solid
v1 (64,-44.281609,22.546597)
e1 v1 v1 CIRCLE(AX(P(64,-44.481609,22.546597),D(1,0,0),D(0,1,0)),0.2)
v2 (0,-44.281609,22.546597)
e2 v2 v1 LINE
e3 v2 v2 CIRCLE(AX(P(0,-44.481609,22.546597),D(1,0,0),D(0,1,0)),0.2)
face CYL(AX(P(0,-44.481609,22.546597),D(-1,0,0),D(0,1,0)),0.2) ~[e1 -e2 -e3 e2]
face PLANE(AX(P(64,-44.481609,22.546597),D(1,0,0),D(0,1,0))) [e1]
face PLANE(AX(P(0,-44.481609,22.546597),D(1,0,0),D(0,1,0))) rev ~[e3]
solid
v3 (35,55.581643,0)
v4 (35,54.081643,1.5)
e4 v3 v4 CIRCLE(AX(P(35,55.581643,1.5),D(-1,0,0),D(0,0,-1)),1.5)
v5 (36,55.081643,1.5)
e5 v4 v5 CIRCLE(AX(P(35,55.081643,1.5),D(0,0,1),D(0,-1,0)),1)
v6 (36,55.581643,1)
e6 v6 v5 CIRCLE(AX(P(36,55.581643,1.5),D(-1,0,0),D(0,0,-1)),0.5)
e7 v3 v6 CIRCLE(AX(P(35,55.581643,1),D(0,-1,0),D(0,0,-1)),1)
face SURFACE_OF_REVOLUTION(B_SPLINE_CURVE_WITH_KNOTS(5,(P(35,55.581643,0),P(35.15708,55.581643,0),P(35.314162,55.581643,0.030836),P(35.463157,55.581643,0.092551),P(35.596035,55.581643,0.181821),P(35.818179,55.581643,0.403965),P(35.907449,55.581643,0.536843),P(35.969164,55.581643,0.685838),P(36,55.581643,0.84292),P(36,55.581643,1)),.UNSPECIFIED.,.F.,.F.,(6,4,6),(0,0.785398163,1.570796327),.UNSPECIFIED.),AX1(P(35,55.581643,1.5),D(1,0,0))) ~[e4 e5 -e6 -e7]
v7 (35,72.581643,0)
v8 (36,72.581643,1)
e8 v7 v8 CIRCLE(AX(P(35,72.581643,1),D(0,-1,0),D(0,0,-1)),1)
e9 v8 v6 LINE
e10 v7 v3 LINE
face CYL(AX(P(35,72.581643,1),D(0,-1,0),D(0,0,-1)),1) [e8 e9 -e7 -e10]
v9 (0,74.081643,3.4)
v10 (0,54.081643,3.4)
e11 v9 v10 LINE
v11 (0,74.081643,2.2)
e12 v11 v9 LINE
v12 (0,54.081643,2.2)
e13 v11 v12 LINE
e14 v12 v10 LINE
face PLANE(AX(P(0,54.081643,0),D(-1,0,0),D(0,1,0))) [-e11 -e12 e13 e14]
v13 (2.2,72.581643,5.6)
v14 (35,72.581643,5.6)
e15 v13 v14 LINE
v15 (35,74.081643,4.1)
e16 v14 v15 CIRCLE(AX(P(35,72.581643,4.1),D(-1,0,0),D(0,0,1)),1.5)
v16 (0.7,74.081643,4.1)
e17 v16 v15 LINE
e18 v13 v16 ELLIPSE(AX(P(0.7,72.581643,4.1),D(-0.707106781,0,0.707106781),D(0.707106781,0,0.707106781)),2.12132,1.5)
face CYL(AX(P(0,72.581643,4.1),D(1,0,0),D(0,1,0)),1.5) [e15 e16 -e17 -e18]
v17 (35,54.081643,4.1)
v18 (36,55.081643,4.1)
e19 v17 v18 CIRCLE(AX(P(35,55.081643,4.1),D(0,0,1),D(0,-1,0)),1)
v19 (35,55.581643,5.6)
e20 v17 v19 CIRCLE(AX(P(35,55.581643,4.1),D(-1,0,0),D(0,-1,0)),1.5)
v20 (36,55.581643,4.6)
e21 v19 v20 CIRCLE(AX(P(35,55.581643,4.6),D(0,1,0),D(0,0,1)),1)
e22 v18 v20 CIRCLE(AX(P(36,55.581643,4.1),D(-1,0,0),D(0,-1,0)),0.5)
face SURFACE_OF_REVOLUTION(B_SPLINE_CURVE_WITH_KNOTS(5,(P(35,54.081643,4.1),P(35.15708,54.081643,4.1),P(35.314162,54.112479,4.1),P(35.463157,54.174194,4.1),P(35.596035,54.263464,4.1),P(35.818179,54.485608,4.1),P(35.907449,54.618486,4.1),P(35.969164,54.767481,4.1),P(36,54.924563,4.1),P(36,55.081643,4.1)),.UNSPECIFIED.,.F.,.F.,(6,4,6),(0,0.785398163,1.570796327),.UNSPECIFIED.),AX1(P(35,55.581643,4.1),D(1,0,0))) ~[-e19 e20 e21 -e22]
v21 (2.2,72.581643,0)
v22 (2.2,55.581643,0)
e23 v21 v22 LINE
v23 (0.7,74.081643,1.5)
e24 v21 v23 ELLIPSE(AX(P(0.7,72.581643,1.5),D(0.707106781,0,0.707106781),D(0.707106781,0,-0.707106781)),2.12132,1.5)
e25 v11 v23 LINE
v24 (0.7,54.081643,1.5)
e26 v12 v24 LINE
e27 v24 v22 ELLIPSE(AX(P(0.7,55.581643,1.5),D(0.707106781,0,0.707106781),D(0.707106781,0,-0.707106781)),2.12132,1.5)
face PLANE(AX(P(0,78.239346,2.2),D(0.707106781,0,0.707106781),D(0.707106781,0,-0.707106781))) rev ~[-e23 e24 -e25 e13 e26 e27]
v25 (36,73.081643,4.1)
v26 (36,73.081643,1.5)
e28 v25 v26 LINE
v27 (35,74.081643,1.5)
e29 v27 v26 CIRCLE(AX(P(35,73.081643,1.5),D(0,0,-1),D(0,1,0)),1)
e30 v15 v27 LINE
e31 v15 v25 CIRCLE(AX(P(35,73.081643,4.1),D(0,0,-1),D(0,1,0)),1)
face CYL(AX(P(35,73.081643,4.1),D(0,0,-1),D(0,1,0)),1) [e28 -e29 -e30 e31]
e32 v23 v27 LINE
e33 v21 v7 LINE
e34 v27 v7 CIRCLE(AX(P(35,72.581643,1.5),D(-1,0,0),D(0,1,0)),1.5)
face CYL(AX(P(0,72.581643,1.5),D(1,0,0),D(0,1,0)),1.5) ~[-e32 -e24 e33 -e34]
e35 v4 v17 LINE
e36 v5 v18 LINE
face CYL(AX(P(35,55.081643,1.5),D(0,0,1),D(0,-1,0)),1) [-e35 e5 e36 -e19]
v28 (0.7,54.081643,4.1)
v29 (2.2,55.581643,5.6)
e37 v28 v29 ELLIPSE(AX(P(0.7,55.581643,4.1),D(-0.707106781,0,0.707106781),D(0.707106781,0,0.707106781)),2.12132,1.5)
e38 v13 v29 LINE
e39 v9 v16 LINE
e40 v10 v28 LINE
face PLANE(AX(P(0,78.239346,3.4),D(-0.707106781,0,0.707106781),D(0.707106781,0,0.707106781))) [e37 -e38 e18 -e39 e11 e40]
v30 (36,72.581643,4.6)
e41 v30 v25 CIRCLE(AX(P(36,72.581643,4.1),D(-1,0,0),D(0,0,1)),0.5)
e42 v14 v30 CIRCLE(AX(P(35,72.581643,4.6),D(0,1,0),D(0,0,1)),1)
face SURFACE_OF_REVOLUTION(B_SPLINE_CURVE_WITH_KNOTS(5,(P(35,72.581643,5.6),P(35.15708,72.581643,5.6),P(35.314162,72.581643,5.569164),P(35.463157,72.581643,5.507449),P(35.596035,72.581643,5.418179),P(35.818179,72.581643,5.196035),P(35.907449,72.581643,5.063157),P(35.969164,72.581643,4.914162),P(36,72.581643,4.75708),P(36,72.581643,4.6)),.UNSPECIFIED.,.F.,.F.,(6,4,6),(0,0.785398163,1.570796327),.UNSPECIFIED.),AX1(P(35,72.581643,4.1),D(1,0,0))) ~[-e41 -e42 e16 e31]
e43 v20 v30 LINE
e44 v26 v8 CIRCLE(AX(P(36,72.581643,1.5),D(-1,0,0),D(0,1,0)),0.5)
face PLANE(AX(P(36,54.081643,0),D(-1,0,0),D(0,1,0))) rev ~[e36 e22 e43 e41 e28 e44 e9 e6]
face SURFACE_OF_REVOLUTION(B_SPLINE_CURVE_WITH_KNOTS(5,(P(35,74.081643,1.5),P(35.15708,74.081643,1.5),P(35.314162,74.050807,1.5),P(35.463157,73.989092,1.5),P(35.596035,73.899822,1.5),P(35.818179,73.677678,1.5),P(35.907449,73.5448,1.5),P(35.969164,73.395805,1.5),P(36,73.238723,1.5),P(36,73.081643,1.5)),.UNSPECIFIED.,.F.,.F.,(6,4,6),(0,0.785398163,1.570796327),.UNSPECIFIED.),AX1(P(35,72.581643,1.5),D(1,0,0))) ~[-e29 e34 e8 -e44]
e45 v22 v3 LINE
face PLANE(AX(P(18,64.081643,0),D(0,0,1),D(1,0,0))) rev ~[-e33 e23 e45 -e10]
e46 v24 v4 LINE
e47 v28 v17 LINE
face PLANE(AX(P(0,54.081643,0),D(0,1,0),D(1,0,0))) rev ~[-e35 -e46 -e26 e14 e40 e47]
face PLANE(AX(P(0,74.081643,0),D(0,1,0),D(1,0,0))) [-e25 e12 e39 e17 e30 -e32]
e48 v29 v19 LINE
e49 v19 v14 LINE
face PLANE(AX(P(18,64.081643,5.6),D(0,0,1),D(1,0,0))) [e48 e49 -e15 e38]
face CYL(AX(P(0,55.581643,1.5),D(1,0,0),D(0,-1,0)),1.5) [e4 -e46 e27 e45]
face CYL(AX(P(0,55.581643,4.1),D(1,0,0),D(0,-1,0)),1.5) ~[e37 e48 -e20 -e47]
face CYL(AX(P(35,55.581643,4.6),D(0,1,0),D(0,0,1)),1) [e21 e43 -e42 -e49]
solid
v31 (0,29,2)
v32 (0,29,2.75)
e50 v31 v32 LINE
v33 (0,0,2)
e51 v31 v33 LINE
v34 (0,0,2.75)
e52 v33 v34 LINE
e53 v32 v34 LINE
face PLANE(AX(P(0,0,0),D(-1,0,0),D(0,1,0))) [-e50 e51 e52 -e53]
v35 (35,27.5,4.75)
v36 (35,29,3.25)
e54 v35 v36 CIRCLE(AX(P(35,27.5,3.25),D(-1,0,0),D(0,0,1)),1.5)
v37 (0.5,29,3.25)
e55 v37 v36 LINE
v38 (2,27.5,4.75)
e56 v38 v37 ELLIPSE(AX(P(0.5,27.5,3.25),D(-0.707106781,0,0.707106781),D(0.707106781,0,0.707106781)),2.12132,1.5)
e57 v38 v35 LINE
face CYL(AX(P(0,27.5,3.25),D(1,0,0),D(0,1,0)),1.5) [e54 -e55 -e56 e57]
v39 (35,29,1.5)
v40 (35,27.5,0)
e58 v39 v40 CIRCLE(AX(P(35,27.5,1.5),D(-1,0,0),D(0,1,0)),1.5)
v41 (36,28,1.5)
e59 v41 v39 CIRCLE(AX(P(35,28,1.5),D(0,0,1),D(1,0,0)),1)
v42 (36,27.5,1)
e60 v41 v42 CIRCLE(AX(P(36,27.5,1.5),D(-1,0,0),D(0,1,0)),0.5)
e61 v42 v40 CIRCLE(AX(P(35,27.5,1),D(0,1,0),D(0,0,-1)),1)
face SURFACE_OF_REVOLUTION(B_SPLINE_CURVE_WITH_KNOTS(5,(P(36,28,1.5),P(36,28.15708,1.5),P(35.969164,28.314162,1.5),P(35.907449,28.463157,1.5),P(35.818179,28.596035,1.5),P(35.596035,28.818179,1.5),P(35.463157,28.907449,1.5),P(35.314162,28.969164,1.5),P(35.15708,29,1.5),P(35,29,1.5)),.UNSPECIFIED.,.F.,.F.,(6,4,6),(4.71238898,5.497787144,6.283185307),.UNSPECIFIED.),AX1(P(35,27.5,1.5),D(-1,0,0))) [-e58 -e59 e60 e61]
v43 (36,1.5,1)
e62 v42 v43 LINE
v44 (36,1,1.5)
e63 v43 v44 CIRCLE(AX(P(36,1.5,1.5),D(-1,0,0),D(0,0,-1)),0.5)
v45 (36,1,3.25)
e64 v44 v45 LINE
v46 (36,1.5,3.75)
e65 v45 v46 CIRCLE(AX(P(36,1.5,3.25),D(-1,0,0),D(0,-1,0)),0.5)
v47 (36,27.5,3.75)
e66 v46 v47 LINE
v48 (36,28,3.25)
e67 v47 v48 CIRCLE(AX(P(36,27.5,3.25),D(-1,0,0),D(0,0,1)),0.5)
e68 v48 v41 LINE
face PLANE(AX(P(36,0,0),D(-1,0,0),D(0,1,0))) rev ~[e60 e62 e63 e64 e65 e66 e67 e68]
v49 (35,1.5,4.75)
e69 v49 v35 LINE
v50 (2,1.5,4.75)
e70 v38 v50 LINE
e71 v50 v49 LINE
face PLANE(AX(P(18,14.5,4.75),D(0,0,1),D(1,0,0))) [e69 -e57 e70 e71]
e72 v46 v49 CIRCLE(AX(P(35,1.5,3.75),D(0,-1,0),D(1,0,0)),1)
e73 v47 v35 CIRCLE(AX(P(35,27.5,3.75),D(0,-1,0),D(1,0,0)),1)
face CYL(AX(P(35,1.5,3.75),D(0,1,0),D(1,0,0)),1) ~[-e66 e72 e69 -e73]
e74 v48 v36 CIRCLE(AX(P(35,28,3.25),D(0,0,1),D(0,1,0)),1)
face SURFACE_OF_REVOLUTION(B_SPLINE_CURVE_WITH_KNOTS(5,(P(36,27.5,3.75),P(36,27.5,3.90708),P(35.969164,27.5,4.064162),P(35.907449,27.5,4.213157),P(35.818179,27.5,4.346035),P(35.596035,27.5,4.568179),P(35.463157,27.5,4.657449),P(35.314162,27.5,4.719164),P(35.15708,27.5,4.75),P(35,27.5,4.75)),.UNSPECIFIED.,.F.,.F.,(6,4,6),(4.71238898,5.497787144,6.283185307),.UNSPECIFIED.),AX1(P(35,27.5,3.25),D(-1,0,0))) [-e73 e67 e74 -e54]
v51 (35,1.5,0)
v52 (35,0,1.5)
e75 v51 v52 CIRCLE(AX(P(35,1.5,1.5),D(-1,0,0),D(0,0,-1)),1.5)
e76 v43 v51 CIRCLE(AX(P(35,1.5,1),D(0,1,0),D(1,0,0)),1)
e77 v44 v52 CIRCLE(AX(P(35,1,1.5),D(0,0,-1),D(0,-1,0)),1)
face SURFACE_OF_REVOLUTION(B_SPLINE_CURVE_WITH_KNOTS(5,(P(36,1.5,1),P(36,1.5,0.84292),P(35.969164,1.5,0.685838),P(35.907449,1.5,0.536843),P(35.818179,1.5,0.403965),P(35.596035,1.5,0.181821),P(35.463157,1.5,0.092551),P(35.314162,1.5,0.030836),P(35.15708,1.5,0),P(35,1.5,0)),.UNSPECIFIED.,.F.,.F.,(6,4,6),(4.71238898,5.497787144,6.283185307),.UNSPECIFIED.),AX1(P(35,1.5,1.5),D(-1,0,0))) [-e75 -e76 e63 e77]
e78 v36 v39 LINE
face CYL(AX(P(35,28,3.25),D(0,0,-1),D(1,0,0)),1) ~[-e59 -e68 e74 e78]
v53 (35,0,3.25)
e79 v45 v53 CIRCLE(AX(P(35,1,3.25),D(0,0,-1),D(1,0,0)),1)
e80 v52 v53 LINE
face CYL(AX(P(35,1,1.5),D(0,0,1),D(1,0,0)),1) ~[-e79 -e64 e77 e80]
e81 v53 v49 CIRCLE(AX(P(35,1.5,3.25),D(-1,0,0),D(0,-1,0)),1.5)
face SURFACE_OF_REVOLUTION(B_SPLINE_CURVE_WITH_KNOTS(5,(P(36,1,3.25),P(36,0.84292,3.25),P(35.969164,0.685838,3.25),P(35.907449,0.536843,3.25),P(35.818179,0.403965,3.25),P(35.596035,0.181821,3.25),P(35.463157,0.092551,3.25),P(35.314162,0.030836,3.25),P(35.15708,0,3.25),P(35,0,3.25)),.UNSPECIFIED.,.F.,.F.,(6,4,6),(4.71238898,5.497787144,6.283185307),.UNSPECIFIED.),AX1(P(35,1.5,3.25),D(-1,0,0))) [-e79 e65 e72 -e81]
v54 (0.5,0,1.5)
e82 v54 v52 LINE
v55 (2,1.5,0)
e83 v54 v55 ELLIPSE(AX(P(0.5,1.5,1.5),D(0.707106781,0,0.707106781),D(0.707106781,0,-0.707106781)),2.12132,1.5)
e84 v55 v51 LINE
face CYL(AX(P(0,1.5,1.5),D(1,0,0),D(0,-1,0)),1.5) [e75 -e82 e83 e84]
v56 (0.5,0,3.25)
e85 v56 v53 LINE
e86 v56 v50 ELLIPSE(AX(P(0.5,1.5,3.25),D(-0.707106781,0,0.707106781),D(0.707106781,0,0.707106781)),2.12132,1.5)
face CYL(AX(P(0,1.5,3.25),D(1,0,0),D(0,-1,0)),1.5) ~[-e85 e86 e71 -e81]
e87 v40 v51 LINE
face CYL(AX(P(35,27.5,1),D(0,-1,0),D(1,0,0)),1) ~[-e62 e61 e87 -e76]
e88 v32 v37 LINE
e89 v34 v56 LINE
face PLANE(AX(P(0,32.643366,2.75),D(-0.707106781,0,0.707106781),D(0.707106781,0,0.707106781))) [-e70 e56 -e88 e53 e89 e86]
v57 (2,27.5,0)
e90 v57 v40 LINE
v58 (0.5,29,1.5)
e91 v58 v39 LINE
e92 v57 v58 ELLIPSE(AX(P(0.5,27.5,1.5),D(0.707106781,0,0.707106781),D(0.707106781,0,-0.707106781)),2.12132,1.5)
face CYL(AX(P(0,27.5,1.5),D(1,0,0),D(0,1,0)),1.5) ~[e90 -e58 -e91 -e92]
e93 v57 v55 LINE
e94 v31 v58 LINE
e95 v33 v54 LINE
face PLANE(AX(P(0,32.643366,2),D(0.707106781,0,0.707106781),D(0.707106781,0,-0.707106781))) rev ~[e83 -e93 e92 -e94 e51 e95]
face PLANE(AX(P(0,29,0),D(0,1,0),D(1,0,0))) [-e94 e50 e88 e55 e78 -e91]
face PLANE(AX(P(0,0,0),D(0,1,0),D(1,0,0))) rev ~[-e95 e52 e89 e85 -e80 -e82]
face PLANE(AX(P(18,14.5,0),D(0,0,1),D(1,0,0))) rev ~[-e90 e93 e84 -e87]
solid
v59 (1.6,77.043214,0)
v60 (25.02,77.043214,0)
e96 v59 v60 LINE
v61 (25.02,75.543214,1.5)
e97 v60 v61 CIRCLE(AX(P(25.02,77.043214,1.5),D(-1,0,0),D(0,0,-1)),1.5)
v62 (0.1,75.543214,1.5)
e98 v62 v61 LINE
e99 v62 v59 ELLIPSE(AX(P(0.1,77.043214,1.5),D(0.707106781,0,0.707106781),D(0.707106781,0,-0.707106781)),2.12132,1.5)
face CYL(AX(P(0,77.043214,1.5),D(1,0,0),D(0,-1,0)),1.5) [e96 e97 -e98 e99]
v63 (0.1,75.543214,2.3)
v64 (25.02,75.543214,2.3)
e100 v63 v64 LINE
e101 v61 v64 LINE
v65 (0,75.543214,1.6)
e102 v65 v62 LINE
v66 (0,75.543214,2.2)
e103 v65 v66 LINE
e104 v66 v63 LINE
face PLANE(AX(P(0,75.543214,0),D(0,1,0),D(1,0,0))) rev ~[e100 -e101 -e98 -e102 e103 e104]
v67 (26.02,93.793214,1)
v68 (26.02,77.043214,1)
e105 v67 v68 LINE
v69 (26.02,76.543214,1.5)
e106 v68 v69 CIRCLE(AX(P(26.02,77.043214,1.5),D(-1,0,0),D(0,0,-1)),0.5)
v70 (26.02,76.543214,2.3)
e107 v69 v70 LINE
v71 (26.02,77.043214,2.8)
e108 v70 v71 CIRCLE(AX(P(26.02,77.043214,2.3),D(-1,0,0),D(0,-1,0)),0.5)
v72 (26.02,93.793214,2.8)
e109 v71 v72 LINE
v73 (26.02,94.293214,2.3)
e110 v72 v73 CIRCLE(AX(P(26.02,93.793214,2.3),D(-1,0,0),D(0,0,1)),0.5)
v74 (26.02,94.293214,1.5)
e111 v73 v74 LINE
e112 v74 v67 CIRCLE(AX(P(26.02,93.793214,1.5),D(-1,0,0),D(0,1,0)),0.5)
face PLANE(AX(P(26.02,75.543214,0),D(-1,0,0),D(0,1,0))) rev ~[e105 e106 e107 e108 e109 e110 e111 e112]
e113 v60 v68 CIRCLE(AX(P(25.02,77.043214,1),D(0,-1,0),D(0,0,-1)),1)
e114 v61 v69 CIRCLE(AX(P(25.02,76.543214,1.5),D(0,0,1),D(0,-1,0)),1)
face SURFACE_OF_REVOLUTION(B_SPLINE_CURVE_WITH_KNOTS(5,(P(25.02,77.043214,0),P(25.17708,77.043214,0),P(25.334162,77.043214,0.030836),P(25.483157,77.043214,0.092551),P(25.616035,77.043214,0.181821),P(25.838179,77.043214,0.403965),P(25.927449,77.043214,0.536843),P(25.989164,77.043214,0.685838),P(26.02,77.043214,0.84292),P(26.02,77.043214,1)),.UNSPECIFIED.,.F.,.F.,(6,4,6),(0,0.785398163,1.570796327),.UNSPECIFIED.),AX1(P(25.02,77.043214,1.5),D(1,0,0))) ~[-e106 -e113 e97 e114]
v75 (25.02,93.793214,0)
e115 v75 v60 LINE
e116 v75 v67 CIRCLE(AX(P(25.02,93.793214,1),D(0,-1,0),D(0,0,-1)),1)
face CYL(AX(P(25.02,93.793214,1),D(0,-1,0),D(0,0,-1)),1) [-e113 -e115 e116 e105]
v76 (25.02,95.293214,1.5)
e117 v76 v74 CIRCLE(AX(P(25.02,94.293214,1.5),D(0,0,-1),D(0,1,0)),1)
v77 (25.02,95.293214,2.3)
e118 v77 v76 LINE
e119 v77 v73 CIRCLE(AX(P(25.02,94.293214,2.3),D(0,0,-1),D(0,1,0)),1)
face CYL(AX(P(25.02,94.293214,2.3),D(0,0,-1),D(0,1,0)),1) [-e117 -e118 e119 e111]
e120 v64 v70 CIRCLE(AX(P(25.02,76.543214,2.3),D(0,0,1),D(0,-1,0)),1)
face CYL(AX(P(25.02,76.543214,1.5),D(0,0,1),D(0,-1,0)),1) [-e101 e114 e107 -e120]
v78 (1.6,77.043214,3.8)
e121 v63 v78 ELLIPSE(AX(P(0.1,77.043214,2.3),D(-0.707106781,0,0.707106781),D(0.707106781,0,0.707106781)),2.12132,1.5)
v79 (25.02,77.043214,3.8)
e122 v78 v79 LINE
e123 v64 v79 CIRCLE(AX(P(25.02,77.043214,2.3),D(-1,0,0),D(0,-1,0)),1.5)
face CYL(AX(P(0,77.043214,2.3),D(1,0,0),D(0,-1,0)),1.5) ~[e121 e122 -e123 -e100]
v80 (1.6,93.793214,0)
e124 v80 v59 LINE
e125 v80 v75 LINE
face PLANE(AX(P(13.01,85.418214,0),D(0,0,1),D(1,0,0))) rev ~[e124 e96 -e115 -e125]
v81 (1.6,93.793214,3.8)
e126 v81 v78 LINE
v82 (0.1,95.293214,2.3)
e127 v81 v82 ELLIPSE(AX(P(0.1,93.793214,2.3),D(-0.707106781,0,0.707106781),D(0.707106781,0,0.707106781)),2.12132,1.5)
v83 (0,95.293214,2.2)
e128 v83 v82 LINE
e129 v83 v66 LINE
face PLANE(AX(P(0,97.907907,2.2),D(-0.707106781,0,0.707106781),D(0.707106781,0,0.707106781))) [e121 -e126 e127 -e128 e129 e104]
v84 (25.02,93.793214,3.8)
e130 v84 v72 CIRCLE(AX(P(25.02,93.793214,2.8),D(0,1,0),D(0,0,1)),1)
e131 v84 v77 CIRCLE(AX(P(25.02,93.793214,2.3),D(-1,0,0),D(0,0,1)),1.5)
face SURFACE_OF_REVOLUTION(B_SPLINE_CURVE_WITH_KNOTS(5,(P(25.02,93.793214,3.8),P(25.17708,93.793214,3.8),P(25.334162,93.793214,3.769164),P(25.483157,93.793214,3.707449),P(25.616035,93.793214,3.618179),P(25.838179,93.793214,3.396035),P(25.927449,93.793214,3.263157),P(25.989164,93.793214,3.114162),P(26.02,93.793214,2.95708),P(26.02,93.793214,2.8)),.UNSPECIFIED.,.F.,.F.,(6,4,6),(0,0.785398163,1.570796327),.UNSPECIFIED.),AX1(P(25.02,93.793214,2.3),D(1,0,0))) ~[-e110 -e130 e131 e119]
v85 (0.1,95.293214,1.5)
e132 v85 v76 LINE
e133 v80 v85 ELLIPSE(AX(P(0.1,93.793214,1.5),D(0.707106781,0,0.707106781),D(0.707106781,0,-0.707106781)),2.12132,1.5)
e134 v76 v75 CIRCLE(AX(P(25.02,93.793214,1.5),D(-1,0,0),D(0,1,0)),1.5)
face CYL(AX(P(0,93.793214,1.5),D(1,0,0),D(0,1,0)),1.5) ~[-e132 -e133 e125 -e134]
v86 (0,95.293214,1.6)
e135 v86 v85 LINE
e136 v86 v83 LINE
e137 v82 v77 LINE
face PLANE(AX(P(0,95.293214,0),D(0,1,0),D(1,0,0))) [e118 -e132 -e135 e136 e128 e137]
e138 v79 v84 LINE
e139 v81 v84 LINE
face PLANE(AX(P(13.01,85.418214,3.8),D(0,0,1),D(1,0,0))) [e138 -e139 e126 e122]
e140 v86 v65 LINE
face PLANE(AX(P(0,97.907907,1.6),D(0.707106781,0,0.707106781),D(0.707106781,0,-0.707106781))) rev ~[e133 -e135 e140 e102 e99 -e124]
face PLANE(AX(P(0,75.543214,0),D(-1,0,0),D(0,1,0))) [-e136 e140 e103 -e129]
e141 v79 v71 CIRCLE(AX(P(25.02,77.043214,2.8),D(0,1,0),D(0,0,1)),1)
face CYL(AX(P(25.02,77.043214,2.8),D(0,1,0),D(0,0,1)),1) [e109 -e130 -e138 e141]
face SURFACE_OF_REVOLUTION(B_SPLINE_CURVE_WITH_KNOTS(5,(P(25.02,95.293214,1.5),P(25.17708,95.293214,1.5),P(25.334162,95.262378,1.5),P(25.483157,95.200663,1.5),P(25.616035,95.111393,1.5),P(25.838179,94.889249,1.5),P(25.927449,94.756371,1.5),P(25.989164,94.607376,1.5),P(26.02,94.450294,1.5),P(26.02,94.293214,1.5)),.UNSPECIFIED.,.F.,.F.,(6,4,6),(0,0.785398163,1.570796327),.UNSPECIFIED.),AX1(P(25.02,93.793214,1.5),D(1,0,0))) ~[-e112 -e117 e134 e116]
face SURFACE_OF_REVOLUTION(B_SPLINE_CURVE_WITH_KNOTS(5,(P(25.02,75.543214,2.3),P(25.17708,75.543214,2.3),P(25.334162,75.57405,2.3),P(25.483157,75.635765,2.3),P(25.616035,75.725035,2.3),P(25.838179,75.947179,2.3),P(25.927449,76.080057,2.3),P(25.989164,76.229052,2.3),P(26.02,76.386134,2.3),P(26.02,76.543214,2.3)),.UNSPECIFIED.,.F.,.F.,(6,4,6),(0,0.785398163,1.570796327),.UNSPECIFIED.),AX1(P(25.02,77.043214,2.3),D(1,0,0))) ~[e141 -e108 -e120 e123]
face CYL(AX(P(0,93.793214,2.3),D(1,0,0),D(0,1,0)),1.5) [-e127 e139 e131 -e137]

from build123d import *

# Parameters (mm, degrees)
F0_W         = 36
F0_H         = 29
F1_DEPTH     = 4.75
F2_R         = 1.5
F3_T1_DEPTH  = 36.2867319519
F4_R         = 1
F5_W         = 36
F5_H         = 20
F6_DEPTH     = 5.6
F7_R         = 1.5
F8_R         = 1
F9_T1_DEPTH  = 28.3154051471
F10_W        = 26.02
F10_H        = 19.75
F11_DEPTH    = 3.8
F12_R        = 1.5
F13_R        = 1
F14_T1_DEPTH = 24.9793855615
F15_R        = 0.2
F16_DEPTH    = 64


# Not quite as in the source:
# - a fillet or chamfer that OpenCascade refuses, or shapes differently, is made with other operations: its cross-section is extruded or revolved along the edge and cut away or added


with BuildPart() as f1:
    # F0 (on Top) → F1 (new body)
    with BuildSketch(Plane.XY):
        with Locations((18, 14.5)):
            Rectangle(F0_W, F0_H)
    extrude(amount=F1_DEPTH)

    # F2
    f2_edges = [f1.edges().sort_by_distance(p)[0] for p in [
        (18, 0, 4.75),
        (18, 0, 0),
        (18, 29, 4.75),
        (18, 29, 0),
    ]]
    fillet(f2_edges, radius=F2_R)

    # F3: chamfer of 2 on 2 edges, made by hand

    # F3_s2 → F3_t1 (cut)
    with BuildSketch(Plane.XZ.offset(-32.6433659759)):
        Polygon((0, 2), (2, 0), (0, 0), align=None)
        Polygon((0, 2.75), (2, 4.75), (0, 4.75), align=None)
    extrude(amount=F3_T1_DEPTH, mode=Mode.SUBTRACT)

    # F4
    f4_edges = [f1.edges().sort_by_distance(p)[0] for p in [
        (36, 14.5, 4.75),
        (36, 14.5, 0),
    ]]
    fillet(f4_edges, radius=F4_R)


with BuildPart() as f6:
    # F5 (on Top) → F6 (new body)
    with BuildSketch(Plane.XY):
        with Locations((18, 64.0816430916)):
            Rectangle(F5_W, F5_H)
    extrude(amount=F6_DEPTH)

    # F7
    f7_edges = [f6.edges().sort_by_distance(p)[0] for p in [
        (18, 54.081643, 5.6),
        (18, 54.081643, 0),
        (18, 74.081643, 5.6),
        (18, 74.081643, 0),
    ]]
    fillet(f7_edges, radius=F7_R)

    # F8
    f8_edges = [f6.edges().sort_by_distance(p)[0] for p in [
        (36, 64.081643, 5.6),
        (36, 64.081643, 0),
    ]]
    fillet(f8_edges, radius=F8_R)

    # F9: chamfer of 2.2 on 2 edges, made by hand

    # F9_s2 → F9_t1 (cut)
    with BuildSketch(Plane.XZ.offset(-78.2393456652)):
        Polygon((0, 3.4), (2.2, 5.6), (0, 5.6), align=None)
        Polygon((0, 2.2), (2.2, 0), (0, 0), align=None)
    extrude(amount=F9_T1_DEPTH, mode=Mode.SUBTRACT)


with BuildPart() as f11:
    # F10 (on Top) → F11 (new body)
    with BuildSketch(Plane.XY):
        with Locations((13.01, 85.4182140244)):
            Rectangle(F10_W, F10_H)
    extrude(amount=F11_DEPTH)

    # F12
    f12_edges = [f11.edges().sort_by_distance(p)[0] for p in [
        (13.01, 75.543214, 3.8),
        (13.01, 75.543214, 0),
        (13.01, 95.293214, 3.8),
        (13.01, 95.293214, 0),
    ]]
    fillet(f12_edges, radius=F12_R)

    # F13
    f13_edges = [f11.edges().sort_by_distance(p)[0] for p in [
        (26.02, 85.418214, 3.8),
        (26.02, 85.418214, 0),
        (26.02, 95.293214, 1.9),
        (26.02, 94.853874, 0.43934),
        (26.02, 94.853874, 3.36066),
        (26.02, 75.982554, 0.43934),
        (26.02, 75.982554, 3.36066),
        (26.02, 75.543214, 1.9),
    ]]
    fillet(f13_edges, radius=F13_R)

    # F14: chamfer of 1.6 on 2 edges, made by hand

    # F14_s2 → F14_t1 (cut)
    with BuildSketch(Plane.XZ.offset(-97.9079068052)):
        Polygon((0, 2.2), (1.6, 3.8), (0, 3.8), align=None)
        Polygon((0, 1.6), (1.6, 0), (0, 0), align=None)
    extrude(amount=F14_T1_DEPTH, mode=Mode.SUBTRACT)


with BuildPart() as f16:
    # F15 (on Right) → F16 (new body)
    with BuildSketch(Plane.YZ):
        with Locations((-44.4816090167, 22.5465968251)):
            Circle(F15_R)
    extrude(amount=F16_DEPTH)


solid = Compound([f1.part, f6.part, f11.part, f16.part])
